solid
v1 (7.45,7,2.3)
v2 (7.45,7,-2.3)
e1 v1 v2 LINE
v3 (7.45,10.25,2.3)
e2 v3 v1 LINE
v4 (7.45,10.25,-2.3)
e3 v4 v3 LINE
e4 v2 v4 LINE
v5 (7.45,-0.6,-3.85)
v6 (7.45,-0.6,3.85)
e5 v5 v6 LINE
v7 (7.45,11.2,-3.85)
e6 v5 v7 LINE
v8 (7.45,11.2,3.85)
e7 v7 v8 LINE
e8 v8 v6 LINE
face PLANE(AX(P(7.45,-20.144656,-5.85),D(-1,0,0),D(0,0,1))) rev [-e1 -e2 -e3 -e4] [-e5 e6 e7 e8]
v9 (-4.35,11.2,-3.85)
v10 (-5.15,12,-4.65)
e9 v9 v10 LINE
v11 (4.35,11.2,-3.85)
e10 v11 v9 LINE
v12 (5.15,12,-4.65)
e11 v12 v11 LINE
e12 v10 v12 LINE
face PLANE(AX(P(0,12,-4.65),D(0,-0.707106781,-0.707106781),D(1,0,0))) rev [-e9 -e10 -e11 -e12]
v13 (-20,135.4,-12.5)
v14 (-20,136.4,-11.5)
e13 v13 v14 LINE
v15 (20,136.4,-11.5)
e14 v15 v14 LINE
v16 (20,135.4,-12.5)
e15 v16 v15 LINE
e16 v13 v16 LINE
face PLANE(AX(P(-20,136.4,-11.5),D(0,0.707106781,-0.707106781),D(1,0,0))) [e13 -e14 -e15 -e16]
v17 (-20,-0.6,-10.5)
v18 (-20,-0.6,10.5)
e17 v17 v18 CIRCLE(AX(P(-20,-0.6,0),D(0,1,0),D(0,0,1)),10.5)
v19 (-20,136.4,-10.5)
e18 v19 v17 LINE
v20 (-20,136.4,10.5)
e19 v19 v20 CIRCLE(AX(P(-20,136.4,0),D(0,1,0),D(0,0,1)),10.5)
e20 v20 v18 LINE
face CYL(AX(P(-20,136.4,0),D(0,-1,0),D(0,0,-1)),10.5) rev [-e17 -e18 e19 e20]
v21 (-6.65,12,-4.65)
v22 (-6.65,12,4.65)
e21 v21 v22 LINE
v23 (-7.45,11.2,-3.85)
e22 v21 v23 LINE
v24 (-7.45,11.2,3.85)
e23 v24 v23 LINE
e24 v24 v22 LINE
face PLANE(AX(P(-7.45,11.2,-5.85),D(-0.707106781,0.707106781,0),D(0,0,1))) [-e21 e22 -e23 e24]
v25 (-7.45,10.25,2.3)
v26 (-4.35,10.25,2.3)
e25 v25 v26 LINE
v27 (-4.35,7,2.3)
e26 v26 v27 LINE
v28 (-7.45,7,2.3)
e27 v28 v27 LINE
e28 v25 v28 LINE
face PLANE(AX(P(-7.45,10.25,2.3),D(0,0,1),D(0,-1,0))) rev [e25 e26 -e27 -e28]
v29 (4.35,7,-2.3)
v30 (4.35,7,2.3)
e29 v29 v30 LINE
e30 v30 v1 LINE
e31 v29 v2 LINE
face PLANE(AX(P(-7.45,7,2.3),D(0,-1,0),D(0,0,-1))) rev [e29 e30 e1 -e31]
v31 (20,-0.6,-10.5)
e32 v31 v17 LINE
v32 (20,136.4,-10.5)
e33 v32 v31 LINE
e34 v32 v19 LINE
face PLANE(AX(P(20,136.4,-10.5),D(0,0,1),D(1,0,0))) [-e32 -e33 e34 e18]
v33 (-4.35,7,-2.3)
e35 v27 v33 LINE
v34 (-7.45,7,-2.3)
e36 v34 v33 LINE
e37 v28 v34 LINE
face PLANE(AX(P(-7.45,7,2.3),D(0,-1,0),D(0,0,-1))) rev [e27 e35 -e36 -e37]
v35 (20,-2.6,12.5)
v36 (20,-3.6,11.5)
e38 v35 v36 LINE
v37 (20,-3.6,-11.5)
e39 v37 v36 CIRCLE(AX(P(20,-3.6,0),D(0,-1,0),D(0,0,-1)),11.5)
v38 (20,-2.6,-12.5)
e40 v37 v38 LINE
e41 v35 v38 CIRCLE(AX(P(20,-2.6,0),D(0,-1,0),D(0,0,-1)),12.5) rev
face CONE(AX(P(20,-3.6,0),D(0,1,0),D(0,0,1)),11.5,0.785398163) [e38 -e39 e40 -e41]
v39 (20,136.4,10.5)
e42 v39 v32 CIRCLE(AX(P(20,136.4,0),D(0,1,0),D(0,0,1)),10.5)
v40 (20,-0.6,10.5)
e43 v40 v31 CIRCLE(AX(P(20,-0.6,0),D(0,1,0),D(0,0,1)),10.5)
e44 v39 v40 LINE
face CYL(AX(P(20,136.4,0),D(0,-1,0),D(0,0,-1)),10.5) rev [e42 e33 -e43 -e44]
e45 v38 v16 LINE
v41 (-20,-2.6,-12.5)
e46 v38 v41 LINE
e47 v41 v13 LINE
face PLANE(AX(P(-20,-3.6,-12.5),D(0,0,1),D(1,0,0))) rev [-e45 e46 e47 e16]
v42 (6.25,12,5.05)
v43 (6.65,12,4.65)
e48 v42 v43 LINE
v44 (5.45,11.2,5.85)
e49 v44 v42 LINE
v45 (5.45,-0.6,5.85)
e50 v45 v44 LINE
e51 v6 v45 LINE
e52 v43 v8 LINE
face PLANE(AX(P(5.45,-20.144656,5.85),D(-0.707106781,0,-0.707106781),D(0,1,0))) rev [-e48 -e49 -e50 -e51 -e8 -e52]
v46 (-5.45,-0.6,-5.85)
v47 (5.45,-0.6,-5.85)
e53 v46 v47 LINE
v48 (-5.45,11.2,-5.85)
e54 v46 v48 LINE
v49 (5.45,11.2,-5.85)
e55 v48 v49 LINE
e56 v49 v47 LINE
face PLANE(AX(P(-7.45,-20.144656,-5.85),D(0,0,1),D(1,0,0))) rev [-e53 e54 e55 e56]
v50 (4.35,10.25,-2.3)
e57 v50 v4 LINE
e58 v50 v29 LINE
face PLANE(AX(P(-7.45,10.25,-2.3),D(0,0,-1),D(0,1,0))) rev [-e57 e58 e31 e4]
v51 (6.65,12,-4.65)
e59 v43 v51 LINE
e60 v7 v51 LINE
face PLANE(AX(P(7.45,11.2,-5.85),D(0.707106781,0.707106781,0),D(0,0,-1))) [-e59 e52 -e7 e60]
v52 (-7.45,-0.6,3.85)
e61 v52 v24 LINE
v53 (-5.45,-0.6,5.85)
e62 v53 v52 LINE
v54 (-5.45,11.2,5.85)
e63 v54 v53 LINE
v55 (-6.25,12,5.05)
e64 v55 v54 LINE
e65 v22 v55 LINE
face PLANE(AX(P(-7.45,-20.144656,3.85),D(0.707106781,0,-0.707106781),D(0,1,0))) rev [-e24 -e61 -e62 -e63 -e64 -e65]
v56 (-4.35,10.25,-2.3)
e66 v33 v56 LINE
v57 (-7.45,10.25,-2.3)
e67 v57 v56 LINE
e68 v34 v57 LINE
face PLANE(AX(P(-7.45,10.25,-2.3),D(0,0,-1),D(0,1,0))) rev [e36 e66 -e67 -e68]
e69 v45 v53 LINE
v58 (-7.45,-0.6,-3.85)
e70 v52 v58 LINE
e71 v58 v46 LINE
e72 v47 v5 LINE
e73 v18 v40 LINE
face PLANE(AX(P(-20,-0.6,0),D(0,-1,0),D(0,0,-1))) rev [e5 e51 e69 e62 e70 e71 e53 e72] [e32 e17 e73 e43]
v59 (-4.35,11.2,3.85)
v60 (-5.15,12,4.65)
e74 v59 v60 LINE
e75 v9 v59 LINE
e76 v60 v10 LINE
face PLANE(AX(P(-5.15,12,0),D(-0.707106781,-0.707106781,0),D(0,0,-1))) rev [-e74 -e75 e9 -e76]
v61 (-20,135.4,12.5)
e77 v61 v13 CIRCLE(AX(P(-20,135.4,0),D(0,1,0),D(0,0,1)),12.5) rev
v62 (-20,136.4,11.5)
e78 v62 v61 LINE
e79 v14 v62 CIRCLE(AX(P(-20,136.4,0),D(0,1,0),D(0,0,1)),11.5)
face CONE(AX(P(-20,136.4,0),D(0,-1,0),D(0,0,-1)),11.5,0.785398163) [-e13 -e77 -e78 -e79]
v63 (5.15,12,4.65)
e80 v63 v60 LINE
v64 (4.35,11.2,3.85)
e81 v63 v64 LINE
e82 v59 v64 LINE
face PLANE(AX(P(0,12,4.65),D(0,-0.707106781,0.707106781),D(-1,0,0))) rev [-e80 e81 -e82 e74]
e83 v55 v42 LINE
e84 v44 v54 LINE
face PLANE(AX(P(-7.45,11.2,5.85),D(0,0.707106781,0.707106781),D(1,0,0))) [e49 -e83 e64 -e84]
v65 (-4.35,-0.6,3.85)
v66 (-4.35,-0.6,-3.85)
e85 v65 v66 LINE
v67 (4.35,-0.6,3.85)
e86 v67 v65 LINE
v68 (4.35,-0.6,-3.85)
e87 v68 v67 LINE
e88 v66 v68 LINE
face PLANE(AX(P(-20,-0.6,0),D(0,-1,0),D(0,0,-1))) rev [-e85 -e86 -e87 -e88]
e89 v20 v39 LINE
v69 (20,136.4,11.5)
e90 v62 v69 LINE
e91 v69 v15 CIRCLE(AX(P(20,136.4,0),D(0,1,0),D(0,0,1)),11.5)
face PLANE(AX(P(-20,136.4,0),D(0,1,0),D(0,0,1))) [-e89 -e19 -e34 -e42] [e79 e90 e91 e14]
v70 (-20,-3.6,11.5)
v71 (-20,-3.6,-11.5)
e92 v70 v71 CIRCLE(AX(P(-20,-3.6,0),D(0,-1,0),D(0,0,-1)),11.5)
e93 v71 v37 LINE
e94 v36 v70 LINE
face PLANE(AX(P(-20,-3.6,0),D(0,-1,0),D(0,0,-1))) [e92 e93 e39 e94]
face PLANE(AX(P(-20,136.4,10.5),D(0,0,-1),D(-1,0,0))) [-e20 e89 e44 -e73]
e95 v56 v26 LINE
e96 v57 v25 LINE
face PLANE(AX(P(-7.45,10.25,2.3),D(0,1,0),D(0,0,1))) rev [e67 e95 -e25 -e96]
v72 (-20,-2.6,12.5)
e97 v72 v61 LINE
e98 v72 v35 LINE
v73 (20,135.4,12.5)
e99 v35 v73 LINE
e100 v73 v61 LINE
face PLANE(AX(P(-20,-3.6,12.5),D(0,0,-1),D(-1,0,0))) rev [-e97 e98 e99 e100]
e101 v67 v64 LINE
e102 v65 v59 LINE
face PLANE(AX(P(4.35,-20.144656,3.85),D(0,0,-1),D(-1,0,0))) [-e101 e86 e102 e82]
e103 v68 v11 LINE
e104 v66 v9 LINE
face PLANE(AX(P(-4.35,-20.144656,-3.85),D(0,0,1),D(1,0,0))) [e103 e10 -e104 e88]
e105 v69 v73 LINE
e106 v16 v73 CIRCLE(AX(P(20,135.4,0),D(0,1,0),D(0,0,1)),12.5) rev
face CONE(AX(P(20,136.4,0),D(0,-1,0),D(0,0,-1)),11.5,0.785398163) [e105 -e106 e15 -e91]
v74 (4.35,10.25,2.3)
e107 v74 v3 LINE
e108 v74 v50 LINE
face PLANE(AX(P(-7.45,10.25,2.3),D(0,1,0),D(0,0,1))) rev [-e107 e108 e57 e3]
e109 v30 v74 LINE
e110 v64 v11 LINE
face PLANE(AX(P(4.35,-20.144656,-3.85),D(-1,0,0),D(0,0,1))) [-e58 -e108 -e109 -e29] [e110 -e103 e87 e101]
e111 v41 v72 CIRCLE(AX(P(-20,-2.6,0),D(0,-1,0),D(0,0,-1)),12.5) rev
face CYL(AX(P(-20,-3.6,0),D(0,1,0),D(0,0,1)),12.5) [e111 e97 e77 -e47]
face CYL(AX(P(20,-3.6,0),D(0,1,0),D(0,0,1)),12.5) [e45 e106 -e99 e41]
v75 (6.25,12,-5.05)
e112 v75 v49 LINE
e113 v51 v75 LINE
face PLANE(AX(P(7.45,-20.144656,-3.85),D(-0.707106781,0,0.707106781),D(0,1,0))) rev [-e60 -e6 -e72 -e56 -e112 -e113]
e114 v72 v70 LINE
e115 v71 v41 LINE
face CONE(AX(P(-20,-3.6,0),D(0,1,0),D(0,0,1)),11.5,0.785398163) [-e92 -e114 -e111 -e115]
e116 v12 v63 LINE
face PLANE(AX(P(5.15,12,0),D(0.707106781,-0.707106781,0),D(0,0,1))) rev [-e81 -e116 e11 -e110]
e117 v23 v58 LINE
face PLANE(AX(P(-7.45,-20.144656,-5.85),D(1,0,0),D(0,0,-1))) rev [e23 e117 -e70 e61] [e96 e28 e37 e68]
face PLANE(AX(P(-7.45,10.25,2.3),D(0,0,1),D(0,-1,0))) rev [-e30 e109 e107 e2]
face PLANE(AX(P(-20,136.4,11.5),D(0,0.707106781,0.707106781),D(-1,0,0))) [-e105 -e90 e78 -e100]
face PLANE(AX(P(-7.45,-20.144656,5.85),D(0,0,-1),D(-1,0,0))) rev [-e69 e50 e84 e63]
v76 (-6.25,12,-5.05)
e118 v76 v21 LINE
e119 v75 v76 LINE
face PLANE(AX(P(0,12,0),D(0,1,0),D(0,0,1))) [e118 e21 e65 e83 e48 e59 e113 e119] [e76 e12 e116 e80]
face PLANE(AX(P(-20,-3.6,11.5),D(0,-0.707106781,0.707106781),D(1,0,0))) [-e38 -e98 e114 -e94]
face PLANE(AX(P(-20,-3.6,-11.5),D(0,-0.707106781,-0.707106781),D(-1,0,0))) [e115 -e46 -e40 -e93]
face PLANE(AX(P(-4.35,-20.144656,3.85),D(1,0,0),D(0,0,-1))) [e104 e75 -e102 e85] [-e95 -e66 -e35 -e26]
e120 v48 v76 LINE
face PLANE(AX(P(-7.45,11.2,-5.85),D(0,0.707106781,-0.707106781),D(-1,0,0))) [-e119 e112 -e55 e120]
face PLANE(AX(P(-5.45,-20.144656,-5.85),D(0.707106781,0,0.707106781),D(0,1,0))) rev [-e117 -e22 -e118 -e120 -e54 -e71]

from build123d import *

# Parameters (mm, degrees)
SKETCH2_W               = 14.9
SKETCH2_H               = 11.7
SKETCH2_W_2             = 8.7
SKETCH2_H_2             = 7.7
BOSS_EXTRUDE1_DEPTH     = 12.6
CUT_EXTRUDE1_DEPTH      = 16.288067242
CUT_EXTRUDE1_DEPTH_BACK = 16.288067242
SKETCH4_W               = 4.6
SKETCH4_H               = 3.25
BOSS_EXTRUDE2_DEPTH     = 3
BOSS_EXTRUDE3_START     = 137
BOSS_EXTRUDE3_DEPTH     = 137
CHAMFER1_SIZE           = 1
CHAMFER2_SIZE           = 0.8
CHAMFER3_SIZE           = 2


with BuildPart() as part:
    # Sketch2 → Boss-Extrude1 (new body)
    with BuildSketch(Plane.XZ.offset(-12)):
        Rectangle(SKETCH2_W, SKETCH2_H)
        Rectangle(SKETCH2_W_2, SKETCH2_H_2, mode=Mode.SUBTRACT)
    extrude(amount=BOSS_EXTRUDE1_DEPTH)

    # Sketch4 → Cut-Extrude1 (cut, two sides: drawn at the far end of the back side and taken through both)
    with BuildSketch(Plane(origin=(0, 0, 0), x_dir=(0, 0, -1), z_dir=(1, 0, 0)).offset(-CUT_EXTRUDE1_DEPTH_BACK)):
        with Locations((0, 8.625)):
            Rectangle(SKETCH4_W, SKETCH4_H)
    extrude(amount=CUT_EXTRUDE1_DEPTH + CUT_EXTRUDE1_DEPTH_BACK, mode=Mode.SUBTRACT)

    # Sketch5 → Boss-Extrude2 (add)
    with BuildSketch(Plane.XZ.offset(0.6)):
        with BuildLine():
            Line((-20, 12.5), (20, 12.5))
            ThreePointArc((20, 12.5), (32.5, 0), (20, -12.5))
            Line((20, -12.5), (-20, -12.5))
            ThreePointArc((-20, -12.5), (-32.5, 0), (-20, 12.5))
        make_face()
    extrude(amount=BOSS_EXTRUDE2_DEPTH)

    # Sketch7 → Boss-Extrude3 (add)
    with BuildSketch(Plane(origin=(0, -0.6, 0), x_dir=(1, 0, 0), z_dir=(0, 1, 0)).offset(BOSS_EXTRUDE3_START)):
        with BuildLine():
            Line((-20, -12.5), (20, -12.5))
            ThreePointArc((20, -12.5), (32.5, 0), (20, 12.5))
            Line((20, 12.5), (-20, 12.5))
            ThreePointArc((-20, 12.5), (-32.5, 0), (-20, -12.5))
        make_face()
        with BuildLine():
            Line((-20, -10.5), (20, -10.5))
            ThreePointArc((20, -10.5), (30.5, 0), (20, 10.5))
            Line((20, 10.5), (-20, 10.5))
            ThreePointArc((-20, 10.5), (-30.5, 0), (-20, -10.5))
        make_face(mode=Mode.SUBTRACT)
    extrude(amount=-BOSS_EXTRUDE3_DEPTH)

    # Chamfer1
    chamfer1_edges = [part.edges().sort_by_distance(p)[0] for p in [
        (-32.5, -3.6, 0),
        (0, -3.6, -12.5),
        (32.5, -3.6, 0),
        (0, -3.6, 12.5),
        (-32.5, 136.4, 0),
        (0, 136.4, 12.5),
        (32.5, 136.4, 0),
        (0, 136.4, -12.5),
    ]]
    chamfer(chamfer1_edges, length=CHAMFER1_SIZE)

    # Chamfer2
    chamfer2_edges = [part.edges().sort_by_distance(p)[0] for p in [
        (0, 12, -3.85),
        (4.35, 12, 0),
        (0, 12, 3.85),
        (-4.35, 12, 0),
        (0, 12, -5.85),
        (-7.45, 12, 0),
        (0, 12, 5.85),
        (7.45, 12, 0),
    ]]
    chamfer(chamfer2_edges, length=CHAMFER2_SIZE)

    # Chamfer3
    # the kernel refuses this chamfer: 2 mm, written as the material it takes off along each edge
    with BuildSketch(Plane(origin=(-7.45, 16.343365976, 5.85), x_dir=(-0.027495876610586053, 0, -0.9996219169112968), z_dir=(0, -1, 0)), Plane(origin=(7.45, 16.343365976, 5.85), x_dir=(-0.9996219169112968, 0, 0.027495876610586487), z_dir=(0, -1, 0))) as chamfer3_piece_1:
        Polygon((CHAMFER3_SIZE * 0.999621916911, CHAMFER3_SIZE * 0.0274958766106), (-CHAMFER3_SIZE * 0.0274958766106, CHAMFER3_SIZE * 0.999621916911), (0, 0), align=None)
    extrude(amount=16.943365976, mode=Mode.SUBTRACT)
    with BuildSketch(Plane(origin=(-7.45, 16.343365976, -5.85), x_dir=(-0.027495876610586924, 0, 0.9996219169112968), z_dir=(0, -1, 0)), Plane(origin=(7.45, 16.343365976, -5.85), x_dir=(-0.9996219169112968, 0, -0.027495876610586487), z_dir=(0, -1, 0))) as chamfer3_piece_2:
        Polygon((CHAMFER3_SIZE * 0.999621916911, -CHAMFER3_SIZE * 0.0274958766106), (-CHAMFER3_SIZE * 0.0274958766106, -CHAMFER3_SIZE * 0.999621916911), (0, 0), align=None)
    extrude(amount=16.943365976, mode=Mode.SUBTRACT)


solid = part.part
